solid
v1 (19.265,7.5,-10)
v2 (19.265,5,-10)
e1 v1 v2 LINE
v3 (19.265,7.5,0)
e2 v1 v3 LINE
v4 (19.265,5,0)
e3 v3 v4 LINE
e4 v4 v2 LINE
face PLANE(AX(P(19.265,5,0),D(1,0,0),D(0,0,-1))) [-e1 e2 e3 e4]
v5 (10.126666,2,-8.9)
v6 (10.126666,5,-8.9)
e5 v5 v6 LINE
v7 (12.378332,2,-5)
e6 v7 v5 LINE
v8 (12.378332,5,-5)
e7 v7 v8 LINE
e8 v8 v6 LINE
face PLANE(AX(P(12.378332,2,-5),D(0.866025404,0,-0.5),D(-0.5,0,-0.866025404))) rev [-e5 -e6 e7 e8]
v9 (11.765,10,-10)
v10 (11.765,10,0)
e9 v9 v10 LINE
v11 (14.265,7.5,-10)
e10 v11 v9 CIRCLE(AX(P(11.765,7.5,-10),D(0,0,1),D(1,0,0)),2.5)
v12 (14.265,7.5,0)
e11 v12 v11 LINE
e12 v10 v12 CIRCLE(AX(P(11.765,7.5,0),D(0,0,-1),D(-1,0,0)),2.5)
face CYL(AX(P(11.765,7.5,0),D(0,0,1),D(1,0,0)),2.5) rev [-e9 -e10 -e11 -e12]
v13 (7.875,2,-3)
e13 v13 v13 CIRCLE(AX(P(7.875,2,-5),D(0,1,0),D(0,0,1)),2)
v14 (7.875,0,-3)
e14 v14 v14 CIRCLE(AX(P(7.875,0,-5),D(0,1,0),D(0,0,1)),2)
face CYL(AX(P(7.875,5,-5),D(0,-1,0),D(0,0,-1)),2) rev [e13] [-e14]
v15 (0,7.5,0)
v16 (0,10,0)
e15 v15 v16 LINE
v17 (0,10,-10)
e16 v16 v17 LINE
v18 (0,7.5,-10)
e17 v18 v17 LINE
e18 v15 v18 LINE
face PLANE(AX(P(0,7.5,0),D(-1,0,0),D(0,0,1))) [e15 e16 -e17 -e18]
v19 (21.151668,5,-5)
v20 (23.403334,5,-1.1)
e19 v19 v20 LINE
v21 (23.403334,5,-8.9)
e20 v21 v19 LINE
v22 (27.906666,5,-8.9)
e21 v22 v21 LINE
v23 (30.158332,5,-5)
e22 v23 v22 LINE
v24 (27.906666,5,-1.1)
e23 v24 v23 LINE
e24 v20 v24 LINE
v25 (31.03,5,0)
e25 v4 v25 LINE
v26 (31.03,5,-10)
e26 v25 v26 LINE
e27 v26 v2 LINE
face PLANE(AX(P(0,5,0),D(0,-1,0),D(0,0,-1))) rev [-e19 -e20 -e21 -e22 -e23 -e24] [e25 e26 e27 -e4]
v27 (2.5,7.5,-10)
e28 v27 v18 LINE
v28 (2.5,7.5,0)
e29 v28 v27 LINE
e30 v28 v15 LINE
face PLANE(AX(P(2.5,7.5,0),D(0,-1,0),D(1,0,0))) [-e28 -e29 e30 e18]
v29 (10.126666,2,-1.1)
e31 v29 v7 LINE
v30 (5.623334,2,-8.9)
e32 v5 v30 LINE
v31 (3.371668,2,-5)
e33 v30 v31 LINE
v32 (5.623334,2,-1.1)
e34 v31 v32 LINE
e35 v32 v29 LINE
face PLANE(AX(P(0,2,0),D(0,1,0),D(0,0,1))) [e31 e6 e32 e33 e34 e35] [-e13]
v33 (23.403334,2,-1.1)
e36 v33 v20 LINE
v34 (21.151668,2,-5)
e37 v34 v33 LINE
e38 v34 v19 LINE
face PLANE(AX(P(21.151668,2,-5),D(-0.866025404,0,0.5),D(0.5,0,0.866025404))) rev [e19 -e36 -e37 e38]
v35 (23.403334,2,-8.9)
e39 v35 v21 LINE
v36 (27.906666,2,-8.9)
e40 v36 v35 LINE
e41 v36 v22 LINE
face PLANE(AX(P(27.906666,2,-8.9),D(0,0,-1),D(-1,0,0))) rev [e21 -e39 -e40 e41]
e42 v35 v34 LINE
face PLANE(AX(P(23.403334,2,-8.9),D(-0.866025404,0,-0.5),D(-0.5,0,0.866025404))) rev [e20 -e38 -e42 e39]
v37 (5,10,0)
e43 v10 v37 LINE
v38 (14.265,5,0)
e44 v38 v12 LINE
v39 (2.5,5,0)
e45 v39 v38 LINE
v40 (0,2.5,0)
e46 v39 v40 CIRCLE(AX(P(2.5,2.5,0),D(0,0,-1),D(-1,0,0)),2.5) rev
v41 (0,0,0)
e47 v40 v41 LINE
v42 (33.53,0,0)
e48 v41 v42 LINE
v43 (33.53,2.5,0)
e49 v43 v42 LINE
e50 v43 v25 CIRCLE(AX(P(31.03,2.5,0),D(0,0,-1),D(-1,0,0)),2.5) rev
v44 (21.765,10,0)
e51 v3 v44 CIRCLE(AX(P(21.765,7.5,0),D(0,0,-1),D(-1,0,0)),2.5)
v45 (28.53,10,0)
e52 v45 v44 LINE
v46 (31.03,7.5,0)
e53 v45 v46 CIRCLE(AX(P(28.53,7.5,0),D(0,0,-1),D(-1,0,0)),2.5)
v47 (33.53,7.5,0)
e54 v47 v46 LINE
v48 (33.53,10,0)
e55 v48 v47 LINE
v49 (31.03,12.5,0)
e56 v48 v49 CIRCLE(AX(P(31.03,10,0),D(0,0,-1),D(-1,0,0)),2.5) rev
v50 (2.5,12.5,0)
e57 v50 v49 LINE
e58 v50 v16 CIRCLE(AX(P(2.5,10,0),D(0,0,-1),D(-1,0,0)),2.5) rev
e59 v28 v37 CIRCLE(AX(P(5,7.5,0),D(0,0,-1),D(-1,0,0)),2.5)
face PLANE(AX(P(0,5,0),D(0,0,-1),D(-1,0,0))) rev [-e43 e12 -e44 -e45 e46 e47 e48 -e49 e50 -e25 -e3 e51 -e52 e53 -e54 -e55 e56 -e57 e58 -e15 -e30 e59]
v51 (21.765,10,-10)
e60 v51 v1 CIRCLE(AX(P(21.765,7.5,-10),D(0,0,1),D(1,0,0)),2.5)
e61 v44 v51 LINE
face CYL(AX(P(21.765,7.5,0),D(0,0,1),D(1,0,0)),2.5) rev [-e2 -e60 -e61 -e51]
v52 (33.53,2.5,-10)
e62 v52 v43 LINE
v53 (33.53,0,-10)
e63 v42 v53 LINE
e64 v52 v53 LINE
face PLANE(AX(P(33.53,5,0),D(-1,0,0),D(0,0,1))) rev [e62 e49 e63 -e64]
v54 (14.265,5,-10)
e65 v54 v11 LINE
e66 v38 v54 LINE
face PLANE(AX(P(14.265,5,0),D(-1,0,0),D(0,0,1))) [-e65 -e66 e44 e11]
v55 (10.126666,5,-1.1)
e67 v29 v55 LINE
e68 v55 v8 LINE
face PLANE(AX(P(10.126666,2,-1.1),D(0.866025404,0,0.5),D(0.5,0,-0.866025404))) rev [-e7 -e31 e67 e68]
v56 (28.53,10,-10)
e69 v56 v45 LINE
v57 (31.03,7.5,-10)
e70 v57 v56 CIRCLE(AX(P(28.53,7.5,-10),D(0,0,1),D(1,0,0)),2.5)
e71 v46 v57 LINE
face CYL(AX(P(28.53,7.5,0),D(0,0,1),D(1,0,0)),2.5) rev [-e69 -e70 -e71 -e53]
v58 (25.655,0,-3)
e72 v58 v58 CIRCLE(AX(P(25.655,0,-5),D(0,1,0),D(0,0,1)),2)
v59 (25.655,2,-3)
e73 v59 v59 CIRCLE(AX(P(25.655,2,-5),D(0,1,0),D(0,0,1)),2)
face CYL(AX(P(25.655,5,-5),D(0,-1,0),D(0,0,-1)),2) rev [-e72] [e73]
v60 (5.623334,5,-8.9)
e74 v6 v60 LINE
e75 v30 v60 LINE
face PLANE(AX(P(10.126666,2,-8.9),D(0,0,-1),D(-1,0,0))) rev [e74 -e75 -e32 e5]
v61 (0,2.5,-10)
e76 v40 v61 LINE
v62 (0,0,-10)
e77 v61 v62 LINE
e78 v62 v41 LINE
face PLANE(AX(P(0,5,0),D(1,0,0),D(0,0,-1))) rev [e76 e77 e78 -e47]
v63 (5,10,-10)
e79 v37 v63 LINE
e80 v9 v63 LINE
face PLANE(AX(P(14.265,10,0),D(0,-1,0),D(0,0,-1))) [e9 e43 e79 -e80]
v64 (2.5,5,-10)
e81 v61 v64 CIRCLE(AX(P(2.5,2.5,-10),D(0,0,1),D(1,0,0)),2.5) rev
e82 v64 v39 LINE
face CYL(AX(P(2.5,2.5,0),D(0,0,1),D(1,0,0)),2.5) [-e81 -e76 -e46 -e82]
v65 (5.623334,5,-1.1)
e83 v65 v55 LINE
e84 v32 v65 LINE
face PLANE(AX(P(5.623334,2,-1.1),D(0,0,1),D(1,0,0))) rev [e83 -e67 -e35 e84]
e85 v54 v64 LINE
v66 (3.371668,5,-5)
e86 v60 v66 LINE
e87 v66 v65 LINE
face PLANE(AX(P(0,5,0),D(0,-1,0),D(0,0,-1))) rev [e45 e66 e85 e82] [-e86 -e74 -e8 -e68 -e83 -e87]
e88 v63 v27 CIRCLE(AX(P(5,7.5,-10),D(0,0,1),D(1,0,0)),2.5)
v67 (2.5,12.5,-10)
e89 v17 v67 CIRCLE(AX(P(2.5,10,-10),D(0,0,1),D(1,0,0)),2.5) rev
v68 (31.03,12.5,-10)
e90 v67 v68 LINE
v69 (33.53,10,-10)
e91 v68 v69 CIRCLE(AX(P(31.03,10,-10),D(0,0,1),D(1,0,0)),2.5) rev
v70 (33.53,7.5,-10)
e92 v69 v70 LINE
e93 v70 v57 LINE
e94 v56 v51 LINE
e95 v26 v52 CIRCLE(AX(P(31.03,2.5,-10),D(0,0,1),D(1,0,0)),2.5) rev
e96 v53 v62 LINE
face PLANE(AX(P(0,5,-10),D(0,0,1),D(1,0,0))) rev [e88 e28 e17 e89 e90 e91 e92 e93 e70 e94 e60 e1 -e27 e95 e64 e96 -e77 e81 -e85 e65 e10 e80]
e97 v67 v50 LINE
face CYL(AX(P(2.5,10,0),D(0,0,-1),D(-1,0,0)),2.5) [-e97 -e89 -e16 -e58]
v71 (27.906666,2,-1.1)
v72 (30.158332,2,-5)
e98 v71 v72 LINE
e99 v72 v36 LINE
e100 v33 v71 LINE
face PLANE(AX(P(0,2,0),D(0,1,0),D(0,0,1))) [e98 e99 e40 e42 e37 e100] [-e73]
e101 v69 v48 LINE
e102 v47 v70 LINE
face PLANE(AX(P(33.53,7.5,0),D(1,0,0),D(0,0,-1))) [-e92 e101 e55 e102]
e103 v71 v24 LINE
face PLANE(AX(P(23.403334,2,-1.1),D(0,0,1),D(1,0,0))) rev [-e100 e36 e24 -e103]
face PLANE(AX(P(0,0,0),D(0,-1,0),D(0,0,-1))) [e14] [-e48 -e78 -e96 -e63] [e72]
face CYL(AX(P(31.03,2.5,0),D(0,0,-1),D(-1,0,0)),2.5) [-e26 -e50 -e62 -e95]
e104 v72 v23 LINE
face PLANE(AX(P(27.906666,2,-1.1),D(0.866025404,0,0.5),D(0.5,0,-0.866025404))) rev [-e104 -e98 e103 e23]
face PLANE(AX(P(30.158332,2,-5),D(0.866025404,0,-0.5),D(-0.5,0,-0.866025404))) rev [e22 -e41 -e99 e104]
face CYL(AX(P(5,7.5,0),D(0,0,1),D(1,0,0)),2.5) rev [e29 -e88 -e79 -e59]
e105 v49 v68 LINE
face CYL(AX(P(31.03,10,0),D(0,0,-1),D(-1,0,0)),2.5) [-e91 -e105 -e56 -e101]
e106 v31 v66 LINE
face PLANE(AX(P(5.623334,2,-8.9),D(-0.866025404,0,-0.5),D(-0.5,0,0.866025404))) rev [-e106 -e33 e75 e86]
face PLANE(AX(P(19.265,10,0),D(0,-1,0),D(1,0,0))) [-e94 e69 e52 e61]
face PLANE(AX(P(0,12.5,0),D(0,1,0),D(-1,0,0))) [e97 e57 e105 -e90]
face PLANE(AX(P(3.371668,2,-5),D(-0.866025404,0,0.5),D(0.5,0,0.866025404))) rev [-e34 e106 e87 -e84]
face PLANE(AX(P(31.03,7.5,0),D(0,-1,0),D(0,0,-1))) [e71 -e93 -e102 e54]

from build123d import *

# Parameters (mm, degrees)
SKETCH2_W           = 33.53
SKETCH2_H           = 10
SKETCH2_R           = 2
BOSS_EXTRUDE1_DEPTH = 5
CUT_EXTRUDE1_DEPTH  = 3
BOSS_EXTRUDE2_DEPTH = 10
FILLET1_START       = -11
FILLET1_DEPTH       = 12
FILLET1_START_2     = -10
FILLET1_2_DEPTH     = 10


with BuildPart() as part:
    # Sketch2 → Boss-Extrude1 (new body)
    with BuildSketch(Plane(origin=(0, 0, 0), x_dir=(1, 0, 0), z_dir=(0, 1, 0))):
        with Locations((16.765, 5)):
            Rectangle(SKETCH2_W, SKETCH2_H)
        with Locations(Location((7.875, 5, 0), (0, 0, 270))):
            Circle(SKETCH2_R, mode=Mode.SUBTRACT)
        with Locations(Location((25.655, 5, 0), (0, 0, 270))):
            Circle(SKETCH2_R, mode=Mode.SUBTRACT)
    extrude(amount=BOSS_EXTRUDE1_DEPTH)

    # Sketch3 → Cut-Extrude1 (cut)
    with BuildSketch(Plane(origin=(0, 5, 0), x_dir=(1, 0, 0), z_dir=(0, 1, 0))):
        Polygon((12.3783321, 5), (10.12666605, 8.9), (5.62333395, 8.9), (3.3716679, 5), (5.62333395, 1.1), (10.12666605, 1.1), align=None)
        Polygon((30.1583321, 5), (27.90666605, 8.9), (23.40333395, 8.9), (21.1516679, 5), (23.40333395, 1.1), (27.90666605, 1.1), align=None)
    extrude(amount=-CUT_EXTRUDE1_DEPTH, mode=Mode.SUBTRACT)

    # Sketch4 → Boss-Extrude2 (add)
    with BuildSketch(Plane(origin=(0, 0, -10), x_dir=(-1, 0, 0), z_dir=(0, 0, -1))):
        Polygon((-14.265, 5), (-14.265, 10), (-2.5, 10), (-2.5, 7.5), (0, 7.5), (0, 12.5), (-33.53, 12.5), (-33.53, 7.5), (-31.03, 7.5), (-31.03, 10), (-19.265, 10), (-19.265, 5), align=None)
    extrude(amount=-BOSS_EXTRUDE2_DEPTH)

    # Fillet1: read off the stored shape, not the designer's step
    # Fillet1 outline → Fillet1 (cut)
    with BuildSketch(Plane.XY.offset(FILLET1_START)):
        with BuildLine():
            Line((33.53, 12.5), (31.03, 12.5))
            ThreePointArc((31.03, 12.5), (32.797766953, 11.767766953), (33.53, 10))
            Line((33.53, 10), (33.53, 12.5))
        make_face()
        with BuildLine():
            ThreePointArc((0, 10), (0.732233047, 11.767766953), (2.5, 12.5))
            Line((2.5, 12.5), (0, 12.5))
            Line((0, 12.5), (0, 10))
        make_face()
        with BuildLine():
            Line((33.53, 5), (31.03, 5))
            ThreePointArc((31.03, 5), (32.797766953, 4.267766953), (33.53, 2.5))
            Line((33.53, 2.5), (33.53, 5))
        make_face()
        with BuildLine():
            ThreePointArc((0, 2.5), (0.732233047, 4.267766953), (2.5, 5))
            Line((2.5, 5), (0, 5))
            Line((0, 5), (0, 2.5))
        make_face()
    extrude(amount=FILLET1_DEPTH, mode=Mode.SUBTRACT)

    # Fillet1 2 outline → Fillet1 2 (add)
    with BuildSketch(Plane.XY.offset(FILLET1_START_2)):
        with BuildLine():
            Line((31.03, 10), (28.53, 10))
            ThreePointArc((28.53, 10), (30.297766953, 9.267766953), (31.03, 7.5))
            Line((31.03, 7.5), (31.03, 10))
        make_face()
        with BuildLine():
            Line((19.265, 10), (19.265, 7.5))
            ThreePointArc((19.265, 7.5), (19.997233047, 9.267766953), (21.765, 10))
            Line((21.765, 10), (19.265, 10))
        make_face()
        with BuildLine():
            ThreePointArc((2.5, 7.5), (3.232233047, 9.267766953), (5, 10))
            Line((5, 10), (2.5, 10))
            Line((2.5, 10), (2.5, 7.5))
        make_face()
        with BuildLine():
            ThreePointArc((11.765, 10), (13.532766953, 9.267766953), (14.265, 7.5))
            Line((14.265, 7.5), (14.265, 10))
            Line((14.265, 10), (11.765, 10))
        make_face()
    extrude(amount=FILLET1_2_DEPTH)


solid = part.part
